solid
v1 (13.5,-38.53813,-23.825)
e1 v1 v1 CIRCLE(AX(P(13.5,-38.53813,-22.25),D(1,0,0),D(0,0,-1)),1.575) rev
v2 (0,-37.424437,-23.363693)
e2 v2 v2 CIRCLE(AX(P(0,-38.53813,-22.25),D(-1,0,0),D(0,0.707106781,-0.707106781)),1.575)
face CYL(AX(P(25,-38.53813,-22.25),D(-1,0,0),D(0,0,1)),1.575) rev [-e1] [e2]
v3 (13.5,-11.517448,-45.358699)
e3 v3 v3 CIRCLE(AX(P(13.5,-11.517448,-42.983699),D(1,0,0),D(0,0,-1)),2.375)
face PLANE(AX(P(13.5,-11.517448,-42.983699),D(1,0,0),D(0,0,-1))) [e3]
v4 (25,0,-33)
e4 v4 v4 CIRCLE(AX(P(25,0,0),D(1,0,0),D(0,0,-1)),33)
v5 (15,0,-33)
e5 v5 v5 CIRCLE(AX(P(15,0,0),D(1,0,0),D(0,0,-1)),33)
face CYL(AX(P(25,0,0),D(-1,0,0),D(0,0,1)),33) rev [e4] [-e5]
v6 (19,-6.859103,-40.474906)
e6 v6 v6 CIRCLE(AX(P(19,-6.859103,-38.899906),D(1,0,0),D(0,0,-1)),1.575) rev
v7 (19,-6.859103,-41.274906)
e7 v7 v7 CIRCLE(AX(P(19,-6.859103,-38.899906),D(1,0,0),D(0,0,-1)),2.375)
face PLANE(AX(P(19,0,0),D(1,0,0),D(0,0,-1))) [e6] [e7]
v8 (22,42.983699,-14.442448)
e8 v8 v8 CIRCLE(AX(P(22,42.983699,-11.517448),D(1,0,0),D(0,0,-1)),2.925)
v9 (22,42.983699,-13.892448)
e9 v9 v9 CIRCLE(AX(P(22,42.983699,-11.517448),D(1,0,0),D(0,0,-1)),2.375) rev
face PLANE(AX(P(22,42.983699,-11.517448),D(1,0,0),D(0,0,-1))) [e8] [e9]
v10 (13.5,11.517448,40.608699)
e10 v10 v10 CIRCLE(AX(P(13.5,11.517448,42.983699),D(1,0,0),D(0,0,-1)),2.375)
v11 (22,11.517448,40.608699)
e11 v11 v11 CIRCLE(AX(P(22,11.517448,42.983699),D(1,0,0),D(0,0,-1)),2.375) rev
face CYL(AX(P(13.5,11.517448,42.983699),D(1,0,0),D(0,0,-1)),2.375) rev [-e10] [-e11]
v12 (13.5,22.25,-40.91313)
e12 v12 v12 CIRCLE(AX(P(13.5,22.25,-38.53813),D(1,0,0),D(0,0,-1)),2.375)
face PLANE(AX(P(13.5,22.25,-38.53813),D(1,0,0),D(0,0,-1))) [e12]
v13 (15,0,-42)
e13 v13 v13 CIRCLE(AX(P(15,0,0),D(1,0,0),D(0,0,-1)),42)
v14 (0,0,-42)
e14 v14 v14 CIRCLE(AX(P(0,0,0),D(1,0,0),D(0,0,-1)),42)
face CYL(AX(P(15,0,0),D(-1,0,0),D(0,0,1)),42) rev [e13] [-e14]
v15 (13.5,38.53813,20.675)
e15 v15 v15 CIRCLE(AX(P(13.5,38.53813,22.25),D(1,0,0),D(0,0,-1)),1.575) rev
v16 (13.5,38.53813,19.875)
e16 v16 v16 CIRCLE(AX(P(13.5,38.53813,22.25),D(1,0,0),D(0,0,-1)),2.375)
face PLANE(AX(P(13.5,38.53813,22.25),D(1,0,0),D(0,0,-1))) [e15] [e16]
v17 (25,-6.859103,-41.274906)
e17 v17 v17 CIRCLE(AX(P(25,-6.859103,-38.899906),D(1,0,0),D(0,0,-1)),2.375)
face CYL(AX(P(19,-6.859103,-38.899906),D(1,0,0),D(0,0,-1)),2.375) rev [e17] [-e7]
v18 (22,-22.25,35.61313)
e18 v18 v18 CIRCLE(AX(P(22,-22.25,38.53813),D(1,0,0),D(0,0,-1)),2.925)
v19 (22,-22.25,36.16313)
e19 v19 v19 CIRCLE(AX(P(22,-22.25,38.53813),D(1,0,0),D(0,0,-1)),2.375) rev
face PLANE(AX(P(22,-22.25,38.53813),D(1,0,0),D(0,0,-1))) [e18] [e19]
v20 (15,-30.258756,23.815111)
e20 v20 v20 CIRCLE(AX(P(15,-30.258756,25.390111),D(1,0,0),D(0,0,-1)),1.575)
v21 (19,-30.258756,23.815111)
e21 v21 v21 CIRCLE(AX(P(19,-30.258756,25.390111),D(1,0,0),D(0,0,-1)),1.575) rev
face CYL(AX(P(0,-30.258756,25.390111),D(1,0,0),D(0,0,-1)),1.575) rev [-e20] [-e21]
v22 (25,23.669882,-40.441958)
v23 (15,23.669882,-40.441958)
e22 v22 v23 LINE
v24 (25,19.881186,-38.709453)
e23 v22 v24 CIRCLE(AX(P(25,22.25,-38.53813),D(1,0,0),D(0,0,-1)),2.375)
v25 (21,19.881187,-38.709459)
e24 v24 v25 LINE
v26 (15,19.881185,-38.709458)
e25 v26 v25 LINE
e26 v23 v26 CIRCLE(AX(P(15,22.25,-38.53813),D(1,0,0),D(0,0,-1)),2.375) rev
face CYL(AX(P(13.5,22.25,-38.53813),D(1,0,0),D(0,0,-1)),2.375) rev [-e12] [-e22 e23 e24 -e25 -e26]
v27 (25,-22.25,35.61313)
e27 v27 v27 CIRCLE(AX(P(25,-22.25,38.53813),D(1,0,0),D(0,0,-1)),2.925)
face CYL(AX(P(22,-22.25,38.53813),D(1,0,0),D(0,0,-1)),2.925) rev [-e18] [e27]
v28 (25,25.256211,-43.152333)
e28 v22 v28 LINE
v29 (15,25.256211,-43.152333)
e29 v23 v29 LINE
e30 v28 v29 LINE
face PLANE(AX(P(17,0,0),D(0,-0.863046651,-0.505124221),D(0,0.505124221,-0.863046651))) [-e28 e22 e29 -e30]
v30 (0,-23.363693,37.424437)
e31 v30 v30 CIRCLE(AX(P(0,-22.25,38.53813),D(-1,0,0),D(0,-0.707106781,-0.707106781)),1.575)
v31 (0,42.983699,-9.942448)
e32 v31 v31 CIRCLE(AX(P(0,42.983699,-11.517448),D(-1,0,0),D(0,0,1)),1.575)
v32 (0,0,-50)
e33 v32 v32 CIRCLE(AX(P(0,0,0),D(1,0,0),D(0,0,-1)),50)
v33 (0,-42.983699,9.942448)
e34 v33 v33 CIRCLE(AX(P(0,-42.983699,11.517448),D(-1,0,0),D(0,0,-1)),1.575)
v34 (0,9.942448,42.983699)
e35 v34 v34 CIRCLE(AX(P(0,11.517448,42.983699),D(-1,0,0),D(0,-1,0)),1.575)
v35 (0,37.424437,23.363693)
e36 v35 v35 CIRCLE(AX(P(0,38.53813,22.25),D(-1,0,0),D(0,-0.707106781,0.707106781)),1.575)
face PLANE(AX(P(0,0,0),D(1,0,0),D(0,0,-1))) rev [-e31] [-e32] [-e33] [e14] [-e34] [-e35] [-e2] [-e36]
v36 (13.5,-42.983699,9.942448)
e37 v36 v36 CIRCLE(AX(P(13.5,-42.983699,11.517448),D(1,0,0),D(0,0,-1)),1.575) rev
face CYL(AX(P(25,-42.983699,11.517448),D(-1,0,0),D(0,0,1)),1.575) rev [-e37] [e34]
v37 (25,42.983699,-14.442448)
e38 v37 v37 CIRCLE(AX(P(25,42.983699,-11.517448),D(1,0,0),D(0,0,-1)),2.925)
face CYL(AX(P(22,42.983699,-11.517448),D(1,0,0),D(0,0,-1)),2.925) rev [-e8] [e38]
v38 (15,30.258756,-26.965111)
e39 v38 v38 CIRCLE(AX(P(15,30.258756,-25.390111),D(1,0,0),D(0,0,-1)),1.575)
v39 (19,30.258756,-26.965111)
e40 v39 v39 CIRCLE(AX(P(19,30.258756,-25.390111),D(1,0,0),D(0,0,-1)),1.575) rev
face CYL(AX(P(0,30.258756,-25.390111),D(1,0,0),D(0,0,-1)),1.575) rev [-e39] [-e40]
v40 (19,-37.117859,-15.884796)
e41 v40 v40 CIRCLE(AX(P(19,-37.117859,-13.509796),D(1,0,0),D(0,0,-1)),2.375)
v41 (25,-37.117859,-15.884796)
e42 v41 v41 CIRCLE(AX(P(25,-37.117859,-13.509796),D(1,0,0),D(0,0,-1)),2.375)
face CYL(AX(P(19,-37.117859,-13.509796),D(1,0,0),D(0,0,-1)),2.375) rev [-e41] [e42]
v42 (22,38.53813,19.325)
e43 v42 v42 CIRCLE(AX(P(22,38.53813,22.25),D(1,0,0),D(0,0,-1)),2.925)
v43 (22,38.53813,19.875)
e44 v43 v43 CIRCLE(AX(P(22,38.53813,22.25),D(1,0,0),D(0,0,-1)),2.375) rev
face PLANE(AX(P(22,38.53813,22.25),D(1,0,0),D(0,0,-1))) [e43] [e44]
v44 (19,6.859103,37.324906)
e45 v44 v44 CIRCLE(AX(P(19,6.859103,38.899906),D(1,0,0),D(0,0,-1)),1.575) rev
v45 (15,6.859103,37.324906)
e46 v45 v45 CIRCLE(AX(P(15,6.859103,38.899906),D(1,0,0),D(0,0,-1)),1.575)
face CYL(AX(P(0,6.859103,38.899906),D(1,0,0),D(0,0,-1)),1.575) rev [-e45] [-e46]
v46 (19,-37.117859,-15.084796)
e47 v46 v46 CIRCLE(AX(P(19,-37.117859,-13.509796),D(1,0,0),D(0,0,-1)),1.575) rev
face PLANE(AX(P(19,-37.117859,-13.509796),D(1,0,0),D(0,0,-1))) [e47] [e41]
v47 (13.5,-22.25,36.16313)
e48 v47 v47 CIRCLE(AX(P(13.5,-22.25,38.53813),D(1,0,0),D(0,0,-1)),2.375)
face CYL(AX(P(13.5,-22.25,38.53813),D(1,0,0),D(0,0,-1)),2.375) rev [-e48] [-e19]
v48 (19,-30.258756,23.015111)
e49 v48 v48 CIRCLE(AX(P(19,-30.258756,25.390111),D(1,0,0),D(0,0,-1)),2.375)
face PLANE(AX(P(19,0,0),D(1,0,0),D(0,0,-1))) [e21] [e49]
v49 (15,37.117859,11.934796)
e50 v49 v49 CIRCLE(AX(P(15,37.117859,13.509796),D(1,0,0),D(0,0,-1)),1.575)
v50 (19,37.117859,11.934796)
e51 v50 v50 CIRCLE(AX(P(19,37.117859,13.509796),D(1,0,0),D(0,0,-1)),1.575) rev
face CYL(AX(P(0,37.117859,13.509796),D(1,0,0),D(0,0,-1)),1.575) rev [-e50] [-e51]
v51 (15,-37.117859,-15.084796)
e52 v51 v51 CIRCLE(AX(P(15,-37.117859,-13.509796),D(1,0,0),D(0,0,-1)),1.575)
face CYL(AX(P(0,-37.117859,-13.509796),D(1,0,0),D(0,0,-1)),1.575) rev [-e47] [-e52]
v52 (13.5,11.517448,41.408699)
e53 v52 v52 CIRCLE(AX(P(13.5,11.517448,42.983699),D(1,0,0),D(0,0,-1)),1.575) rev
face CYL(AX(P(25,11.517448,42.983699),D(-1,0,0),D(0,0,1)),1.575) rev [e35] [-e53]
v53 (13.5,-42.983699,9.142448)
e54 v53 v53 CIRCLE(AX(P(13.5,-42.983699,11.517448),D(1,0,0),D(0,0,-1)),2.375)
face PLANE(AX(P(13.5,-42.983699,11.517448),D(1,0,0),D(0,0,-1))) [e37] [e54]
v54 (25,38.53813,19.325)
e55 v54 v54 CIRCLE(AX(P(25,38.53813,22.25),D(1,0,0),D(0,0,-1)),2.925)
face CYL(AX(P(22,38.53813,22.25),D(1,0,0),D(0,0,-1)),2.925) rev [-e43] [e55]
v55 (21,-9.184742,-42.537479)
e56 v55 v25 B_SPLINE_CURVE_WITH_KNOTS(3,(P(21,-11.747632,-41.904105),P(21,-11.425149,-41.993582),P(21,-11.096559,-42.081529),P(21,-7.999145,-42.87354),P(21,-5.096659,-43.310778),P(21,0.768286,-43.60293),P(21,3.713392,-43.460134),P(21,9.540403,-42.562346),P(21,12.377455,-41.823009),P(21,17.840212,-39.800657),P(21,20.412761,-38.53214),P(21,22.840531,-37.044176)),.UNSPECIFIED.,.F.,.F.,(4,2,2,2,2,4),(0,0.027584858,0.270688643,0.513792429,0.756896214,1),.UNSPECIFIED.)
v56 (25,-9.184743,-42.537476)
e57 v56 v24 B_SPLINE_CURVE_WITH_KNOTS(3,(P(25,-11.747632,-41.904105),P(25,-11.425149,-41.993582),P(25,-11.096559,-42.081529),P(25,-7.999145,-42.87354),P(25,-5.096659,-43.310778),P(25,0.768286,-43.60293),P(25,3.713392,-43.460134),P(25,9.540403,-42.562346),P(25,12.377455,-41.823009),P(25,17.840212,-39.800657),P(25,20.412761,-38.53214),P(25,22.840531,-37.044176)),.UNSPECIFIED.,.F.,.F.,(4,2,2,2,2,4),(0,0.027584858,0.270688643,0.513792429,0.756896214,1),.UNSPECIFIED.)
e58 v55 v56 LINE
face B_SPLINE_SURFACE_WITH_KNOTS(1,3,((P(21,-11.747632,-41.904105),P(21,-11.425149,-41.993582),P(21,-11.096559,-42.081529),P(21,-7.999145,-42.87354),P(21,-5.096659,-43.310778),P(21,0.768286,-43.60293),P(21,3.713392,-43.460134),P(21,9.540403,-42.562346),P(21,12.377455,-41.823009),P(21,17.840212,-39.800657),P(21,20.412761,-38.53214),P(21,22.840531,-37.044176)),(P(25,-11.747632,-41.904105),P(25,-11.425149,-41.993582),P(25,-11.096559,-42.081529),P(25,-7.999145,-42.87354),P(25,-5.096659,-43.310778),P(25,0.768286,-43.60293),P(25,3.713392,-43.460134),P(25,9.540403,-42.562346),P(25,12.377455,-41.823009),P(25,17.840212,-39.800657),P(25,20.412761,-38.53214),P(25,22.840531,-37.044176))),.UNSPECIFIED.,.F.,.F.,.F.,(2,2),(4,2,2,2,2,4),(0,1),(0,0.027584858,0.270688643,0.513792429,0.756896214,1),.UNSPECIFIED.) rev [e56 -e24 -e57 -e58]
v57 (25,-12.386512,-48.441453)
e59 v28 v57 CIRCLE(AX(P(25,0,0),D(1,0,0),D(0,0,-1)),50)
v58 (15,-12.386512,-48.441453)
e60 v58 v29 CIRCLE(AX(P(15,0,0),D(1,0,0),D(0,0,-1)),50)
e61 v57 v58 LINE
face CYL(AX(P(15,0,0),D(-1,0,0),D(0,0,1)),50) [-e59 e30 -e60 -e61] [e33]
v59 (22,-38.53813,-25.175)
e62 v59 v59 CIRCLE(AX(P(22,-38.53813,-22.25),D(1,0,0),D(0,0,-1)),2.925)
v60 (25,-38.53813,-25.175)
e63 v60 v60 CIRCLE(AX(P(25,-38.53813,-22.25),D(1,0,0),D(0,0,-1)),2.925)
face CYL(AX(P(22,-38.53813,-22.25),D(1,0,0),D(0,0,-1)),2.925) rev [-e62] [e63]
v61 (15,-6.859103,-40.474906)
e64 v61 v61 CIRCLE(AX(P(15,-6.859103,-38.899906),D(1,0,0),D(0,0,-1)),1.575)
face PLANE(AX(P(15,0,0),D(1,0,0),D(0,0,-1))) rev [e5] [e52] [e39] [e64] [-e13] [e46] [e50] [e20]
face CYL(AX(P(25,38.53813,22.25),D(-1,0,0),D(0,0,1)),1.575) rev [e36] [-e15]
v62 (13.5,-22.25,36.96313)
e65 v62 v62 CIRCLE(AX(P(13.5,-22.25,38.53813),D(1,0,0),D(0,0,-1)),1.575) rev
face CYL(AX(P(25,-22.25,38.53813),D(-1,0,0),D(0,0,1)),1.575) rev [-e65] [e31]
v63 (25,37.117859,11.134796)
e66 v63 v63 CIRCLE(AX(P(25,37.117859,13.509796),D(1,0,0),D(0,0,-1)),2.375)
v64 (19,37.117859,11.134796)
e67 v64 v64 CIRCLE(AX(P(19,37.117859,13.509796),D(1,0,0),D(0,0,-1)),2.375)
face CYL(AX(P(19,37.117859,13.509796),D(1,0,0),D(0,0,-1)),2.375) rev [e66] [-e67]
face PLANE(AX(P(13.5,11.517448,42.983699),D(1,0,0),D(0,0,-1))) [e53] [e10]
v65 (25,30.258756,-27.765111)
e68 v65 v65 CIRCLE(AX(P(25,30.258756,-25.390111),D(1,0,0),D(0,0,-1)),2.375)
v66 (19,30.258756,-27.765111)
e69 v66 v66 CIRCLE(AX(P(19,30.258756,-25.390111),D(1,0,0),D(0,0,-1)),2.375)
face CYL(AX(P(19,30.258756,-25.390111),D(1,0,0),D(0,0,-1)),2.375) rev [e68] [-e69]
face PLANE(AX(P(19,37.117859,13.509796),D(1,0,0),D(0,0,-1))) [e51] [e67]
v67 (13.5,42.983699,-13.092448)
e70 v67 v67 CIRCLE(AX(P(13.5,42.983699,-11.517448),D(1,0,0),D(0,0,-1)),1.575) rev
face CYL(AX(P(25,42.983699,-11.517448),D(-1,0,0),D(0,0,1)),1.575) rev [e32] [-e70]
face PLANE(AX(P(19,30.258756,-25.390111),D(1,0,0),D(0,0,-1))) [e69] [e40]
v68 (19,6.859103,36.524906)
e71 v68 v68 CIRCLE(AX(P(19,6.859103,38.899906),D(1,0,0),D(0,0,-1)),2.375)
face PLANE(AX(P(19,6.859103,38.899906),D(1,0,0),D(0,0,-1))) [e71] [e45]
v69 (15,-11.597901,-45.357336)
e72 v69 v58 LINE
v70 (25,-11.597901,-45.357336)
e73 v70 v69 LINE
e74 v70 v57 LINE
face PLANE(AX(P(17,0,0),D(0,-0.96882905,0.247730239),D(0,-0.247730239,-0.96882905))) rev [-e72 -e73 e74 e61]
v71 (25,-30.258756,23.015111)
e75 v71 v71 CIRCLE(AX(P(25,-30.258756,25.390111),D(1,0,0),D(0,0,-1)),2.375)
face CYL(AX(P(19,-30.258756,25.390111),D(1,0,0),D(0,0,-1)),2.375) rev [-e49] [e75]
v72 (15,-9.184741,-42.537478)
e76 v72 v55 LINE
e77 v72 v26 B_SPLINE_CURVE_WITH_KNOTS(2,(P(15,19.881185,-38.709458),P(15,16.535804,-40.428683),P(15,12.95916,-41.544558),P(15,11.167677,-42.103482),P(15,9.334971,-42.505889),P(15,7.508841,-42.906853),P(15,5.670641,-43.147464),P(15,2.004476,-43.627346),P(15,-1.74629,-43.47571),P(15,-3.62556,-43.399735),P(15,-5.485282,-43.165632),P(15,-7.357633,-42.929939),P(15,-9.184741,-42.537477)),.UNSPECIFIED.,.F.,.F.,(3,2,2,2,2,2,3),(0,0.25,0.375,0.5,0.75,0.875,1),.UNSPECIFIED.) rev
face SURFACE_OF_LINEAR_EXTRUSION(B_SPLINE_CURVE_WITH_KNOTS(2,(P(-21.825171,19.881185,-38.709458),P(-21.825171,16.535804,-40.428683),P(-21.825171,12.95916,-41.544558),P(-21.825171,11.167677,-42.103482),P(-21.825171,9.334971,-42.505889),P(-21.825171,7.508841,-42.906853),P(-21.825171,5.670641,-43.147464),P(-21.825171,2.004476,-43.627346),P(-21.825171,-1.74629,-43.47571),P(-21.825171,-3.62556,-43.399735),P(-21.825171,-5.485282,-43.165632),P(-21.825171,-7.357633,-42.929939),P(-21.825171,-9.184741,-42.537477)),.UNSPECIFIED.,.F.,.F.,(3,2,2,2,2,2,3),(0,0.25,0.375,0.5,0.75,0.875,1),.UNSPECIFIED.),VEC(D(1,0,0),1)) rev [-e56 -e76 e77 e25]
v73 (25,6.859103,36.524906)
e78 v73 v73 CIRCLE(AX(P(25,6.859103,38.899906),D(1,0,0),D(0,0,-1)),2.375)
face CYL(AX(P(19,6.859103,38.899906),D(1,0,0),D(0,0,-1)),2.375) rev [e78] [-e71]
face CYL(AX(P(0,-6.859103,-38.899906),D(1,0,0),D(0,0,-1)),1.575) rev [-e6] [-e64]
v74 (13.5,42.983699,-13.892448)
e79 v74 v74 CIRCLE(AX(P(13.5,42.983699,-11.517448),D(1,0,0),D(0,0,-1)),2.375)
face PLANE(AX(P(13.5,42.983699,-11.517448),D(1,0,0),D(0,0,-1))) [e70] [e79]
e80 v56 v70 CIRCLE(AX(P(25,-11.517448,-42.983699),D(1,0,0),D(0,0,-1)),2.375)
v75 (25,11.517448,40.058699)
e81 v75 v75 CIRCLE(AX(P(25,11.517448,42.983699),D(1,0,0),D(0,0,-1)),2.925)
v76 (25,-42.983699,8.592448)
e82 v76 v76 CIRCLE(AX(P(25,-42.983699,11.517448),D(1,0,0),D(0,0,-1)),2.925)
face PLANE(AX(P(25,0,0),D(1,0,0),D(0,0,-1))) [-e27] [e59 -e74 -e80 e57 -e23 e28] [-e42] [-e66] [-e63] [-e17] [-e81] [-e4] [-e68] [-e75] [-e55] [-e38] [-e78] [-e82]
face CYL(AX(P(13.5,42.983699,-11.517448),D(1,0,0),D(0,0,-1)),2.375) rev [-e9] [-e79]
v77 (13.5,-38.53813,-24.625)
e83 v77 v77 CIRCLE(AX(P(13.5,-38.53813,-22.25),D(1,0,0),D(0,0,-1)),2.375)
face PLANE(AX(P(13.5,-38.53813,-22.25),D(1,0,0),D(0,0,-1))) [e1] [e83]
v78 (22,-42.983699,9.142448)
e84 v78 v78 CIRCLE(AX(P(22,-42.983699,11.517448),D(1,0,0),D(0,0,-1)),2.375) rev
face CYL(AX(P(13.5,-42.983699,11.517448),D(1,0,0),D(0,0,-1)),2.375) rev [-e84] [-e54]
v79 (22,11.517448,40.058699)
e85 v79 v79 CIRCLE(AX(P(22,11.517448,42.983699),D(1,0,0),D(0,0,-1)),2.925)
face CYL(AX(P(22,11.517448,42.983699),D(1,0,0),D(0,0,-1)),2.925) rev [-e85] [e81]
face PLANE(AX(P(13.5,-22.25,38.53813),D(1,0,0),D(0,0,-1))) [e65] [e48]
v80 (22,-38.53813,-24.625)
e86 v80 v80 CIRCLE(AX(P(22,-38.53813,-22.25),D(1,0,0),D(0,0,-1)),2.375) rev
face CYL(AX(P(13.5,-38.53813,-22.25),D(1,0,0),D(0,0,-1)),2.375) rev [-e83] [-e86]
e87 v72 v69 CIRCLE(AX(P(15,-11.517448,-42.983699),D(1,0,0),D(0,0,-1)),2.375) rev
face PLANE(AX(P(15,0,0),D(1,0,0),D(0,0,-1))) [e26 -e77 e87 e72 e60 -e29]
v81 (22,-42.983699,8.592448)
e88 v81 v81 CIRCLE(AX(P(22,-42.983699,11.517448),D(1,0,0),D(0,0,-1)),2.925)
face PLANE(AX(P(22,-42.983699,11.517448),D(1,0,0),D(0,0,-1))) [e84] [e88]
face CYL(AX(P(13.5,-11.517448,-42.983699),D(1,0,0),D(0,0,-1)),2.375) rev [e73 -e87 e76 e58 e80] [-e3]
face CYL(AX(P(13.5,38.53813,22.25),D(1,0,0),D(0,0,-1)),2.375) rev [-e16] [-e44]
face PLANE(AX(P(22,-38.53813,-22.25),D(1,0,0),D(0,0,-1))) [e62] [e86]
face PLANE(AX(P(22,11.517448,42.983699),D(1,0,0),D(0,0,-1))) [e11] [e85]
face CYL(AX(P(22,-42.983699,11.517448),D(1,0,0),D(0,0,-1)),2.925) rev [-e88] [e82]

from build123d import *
from OCP.BRepAlgoAPI import BRepAlgoAPI_Cut
from OCP.TopTools import TopTools_ListOfShape

# Parameters (mm, degrees)
SKETCH1_R           = 50
SKETCH1_R_2         = 42
BOSS_EXTRUDE1_DEPTH = 15
SKETCH2_R           = 47.5
SKETCH2_R_2         = 33
BOSS_EXTRUDE2_DEPTH = 10
SKETCH4_R           = 1.575
CUT_EXTRUDE2_DEPTH  = 76
CIRPATTERN2_COUNT   = 8
SKETCH7_R           = 1.575
CUT_EXTRUDE3_DEPTH  = 76
CIRPATTERN3_COUNT   = 6
SKETCH17_R          = 2.375
CUT_EXTRUDE7_DEPTH  = 11.5
SKETCH18_R          = 2.375
SKETCH18_R_2        = 1.575
CUT_EXTRUDE8_DEPTH  = 6
CUT_EXTRUDE6_DEPTH  = 8
CUT_SWEEP1_START    = 21
CUT_SWEEP1_DEPTH    = 5
BOSS_EXTRUDE6_DEPTH = 10
SKETCH19_R          = 1.575
BOSS_EXTRUDE7_DEPTH = 13.5
CUT_EXTRUDE9_START  = -6
CUT_EXTRUDE9_DEPTH  = 6
SKETCH21_R          = 2.925
CUT_EXTRUDE10_DEPTH = 3


with BuildPart() as part:
    # Sketch1 → Boss-Extrude1 (new body)
    with BuildSketch(Plane(origin=(0, 0, 0), x_dir=(0, 0, -1), z_dir=(1, 0, 0))):
        Circle(SKETCH1_R)
        Circle(SKETCH1_R_2, mode=Mode.SUBTRACT)
    extrude(amount=BOSS_EXTRUDE1_DEPTH)

    # Sketch2 → Boss-Extrude2 (add)
    with BuildSketch(Plane(origin=(15, 0, 0), x_dir=(0, 0, -1), z_dir=(1, 0, 0))):
        Circle(SKETCH2_R)
        Circle(SKETCH2_R_2, mode=Mode.SUBTRACT)
    extrude(amount=BOSS_EXTRUDE2_DEPTH)

    # Sketch4 → Cut-Extrude2 (cut, through all)
    with BuildSketch(Plane.ZY):
        with Locations((-11.517447507, 42.98369927)):
            Circle(SKETCH4_R)
    cut_extrude2 = extrude(amount=-CUT_EXTRUDE2_DEPTH, mode=Mode.SUBTRACT)

    # CirPattern2: Cut-Extrude2 ×8 about axis
    cirpattern2_axis = Axis((0, 0, 0), (1, 0, 0))
    for i in range(1, CIRPATTERN2_COUNT):
        add(cut_extrude2.rotate(cirpattern2_axis, i * 360 / CIRPATTERN2_COUNT), mode=Mode.SUBTRACT)

    # Sketch7 → Cut-Extrude3 (cut, through all)
    with BuildSketch(Plane(origin=(25, 0, 0), x_dir=(0, 0, -1), z_dir=(1, 0, 0))):
        with Locations((-13.509795661, 37.117858521)):
            Circle(SKETCH7_R)
    cut_extrude3 = extrude(amount=-CUT_EXTRUDE3_DEPTH, mode=Mode.SUBTRACT)

    # CirPattern3: Cut-Extrude3 ×6 about axis
    cirpattern3_axis = Axis((0, 0, 0), (1, 0, 0))
    for i in range(1, CIRPATTERN3_COUNT):
        add(cut_extrude3.rotate(cirpattern3_axis, i * 360 / CIRPATTERN3_COUNT), mode=Mode.SUBTRACT)

    # Sketch17 → Cut-Extrude7 (cut)
    with BuildSketch(Plane(origin=(25, 0, 0), x_dir=(0, 0, -1), z_dir=(1, 0, 0))):
        with Locations((-42.98369927, 11.517447507)):
            Circle(SKETCH17_R)
        with Locations((-38.538130468, -22.25)):
            Circle(SKETCH17_R)
        with Locations((-11.517447507, -42.98369927)):
            Circle(SKETCH17_R)
        with Locations((22.25, -38.538130468)):
            Circle(SKETCH17_R)
        with Locations((42.98369927, -11.517447507)):
            Circle(SKETCH17_R)
        with Locations((38.538130468, 22.25)):
            Circle(SKETCH17_R)
        with Locations((11.517447507, 42.98369927)):
            Circle(SKETCH17_R)
        with Locations((-22.25, 38.538130468)):
            Circle(SKETCH17_R)
    extrude(amount=-CUT_EXTRUDE7_DEPTH, mode=Mode.SUBTRACT)

    # Sketch18 → Cut-Extrude8 (cut)
    # profile 1 of 6: a face of its own
    with BuildSketch(Plane(origin=(25, 0, 0), x_dir=(0, 0, -1), z_dir=(1, 0, 0))):
        with Locations((-38.899906244, 6.859103018)):
            Circle(SKETCH18_R)
        with Locations((-38.899906244, 6.859103018)):
            Circle(SKETCH18_R_2, mode=Mode.SUBTRACT)
    # profile 2 of 6: a face of its own
    with BuildSketch(Plane(origin=(25, 0, 0), x_dir=(0, 0, -1), z_dir=(1, 0, 0))):
        with Locations((-25.390110583, -30.258755503)):
            Circle(SKETCH18_R)
        with Locations((-25.390110583, -30.258755503)):
            Circle(SKETCH18_R_2, mode=Mode.SUBTRACT)
    # profile 3 of 6: a face of its own
    with BuildSketch(Plane(origin=(25, 0, 0), x_dir=(0, 0, -1), z_dir=(1, 0, 0))):
        with Locations((13.509795661, -37.117858521)):
            Circle(SKETCH18_R)
        with Locations((13.509795661, -37.117858521)):
            Circle(SKETCH18_R_2, mode=Mode.SUBTRACT)
    # profile 4 of 6: a face of its own
    with BuildSketch(Plane(origin=(25, 0, 0), x_dir=(0, 0, -1), z_dir=(1, 0, 0))):
        with Locations((38.899906244, -6.859103018)):
            Circle(SKETCH18_R)
        with Locations((38.899906244, -6.859103018)):
            Circle(SKETCH18_R_2, mode=Mode.SUBTRACT)
    # profile 5 of 6: a face of its own
    with BuildSketch(Plane(origin=(25, 0, 0), x_dir=(0, 0, -1), z_dir=(1, 0, 0))):
        with Locations((25.390110583, 30.258755503)):
            Circle(SKETCH18_R)
        with Locations((25.390110583, 30.258755503)):
            Circle(SKETCH18_R_2, mode=Mode.SUBTRACT)
    # profile 6 of 6: a face of its own
    with BuildSketch(Plane(origin=(25, 0, 0), x_dir=(0, 0, -1), z_dir=(1, 0, 0))):
        with Locations((-13.509795661, 37.117858521)):
            Circle(SKETCH18_R)
        with Locations((-13.509795661, 37.117858521)):
            Circle(SKETCH18_R_2, mode=Mode.SUBTRACT)
    extrude(amount=-CUT_EXTRUDE8_DEPTH, mode=Mode.SUBTRACT)

    # Sketch12 → Cut-Extrude6 (cut)
    with BuildSketch(Plane(origin=(25, 0, 0), x_dir=(0, 0, -1), z_dir=(1, 0, 0))):
        with BuildLine():
            ThreePointArc((39.732510194, 23.254656307), (45.589669783, 6.405733006), (44.602467407, -11.404880862))
            Line((44.602467407, -11.404880862), (46.019379893, -11.767186336))
            ThreePointArc((46.019379893, -11.767186336), (47.128391363, -5.929985459), (47.5, 0))
            ThreePointArc((47.5, 0), (45.84484162, 12.429822882), (40.994715921, 23.99340048))
            Line((40.994715921, 23.99340048), (39.732510194, 23.254656307))
        make_face()
        with BuildLine():
            ThreePointArc((47.5, 0), (47.128391363, -5.929985459), (46.019379893, -11.767186336))
            Line((46.019379893, -11.767186336), (47.508954558, -12.148071578))
            ThreePointArc((47.508954558, -12.148071578), (48.560487254, 6.82315791), (42.321650147, 24.770028969))
            Line((42.321650147, 24.770028969), (40.994715921, 23.99340048))
            ThreePointArc((40.994715921, 23.99340048), (45.84484162, 12.429822882), (47.5, 0))
        make_face()
        with BuildLine():
            ThreePointArc((44.909683958, -10.127768414), (44.760630743, -10.767420383), (44.602467407, -11.404880862))
            Line((44.602467407, -11.404880862), (45.357336181, -11.597901314))
            ThreePointArc((45.357336181, -11.597901314), (45.358358473, -11.557680184), (45.35869927, -11.517447507))
            ThreePointArc((45.35869927, -11.517447507), (45.243659295, -10.787238165), (44.909683958, -10.127768414))
        make_face()
        with BuildLine():
            ThreePointArc((39.732510194, 23.254656307), (40.255948718, 22.336293316), (40.758164235, 21.406154592))
            ThreePointArc((40.758164235, 21.406154592), (40.874067668, 21.821021677), (40.913130468, 22.25))
            ThreePointArc((40.913130468, 22.25), (40.792261739, 22.998008833), (40.441958077, 23.669882191))
            Line((40.441958077, 23.669882191), (39.732510194, 23.254656307))
        make_face()
    extrude(amount=-CUT_EXTRUDE6_DEPTH, mode=Mode.SUBTRACT)

    # Cut-Sweep1: read off the stored shape, not the designer's step
    # Cut-Sweep1 outline → Cut-Sweep1 (cut)
    with BuildSketch(Plane.YZ.offset(CUT_SWEEP1_START)):
        with BuildLine():
            add(Edge.make_bspline(
                [(-9.184742958, -42.537476808), (-6.896414636, -43.029008788), (-4.540142558, -43.338499502), (0.768286017, -43.602929952), (3.713391759, -43.460134373), (9.540403061, -42.562346065), (12.377455207, -41.823008905), (16.756379009, -40.201899634), (18.346135753, -39.498335389), (19.881187558, -38.709456514)],
                knots=[0.073720378, 0.073720378, 0.073720378, 0.073720378, 0.270688643, 0.270688643, 0.513792429, 0.513792429, 0.756896214, 0.756896214, 0.903534461, 0.903534461, 0.903534461, 0.903534461], degree=3))
            ThreePointArc((-9.184742958, -42.537476808), (-9.310441235, -43.861052286), (-10.127768414, -44.909683958))
            ThreePointArc((-10.127768414, -44.909683958), (6.009099575, -45.643642805), (21.406154592, -40.758164235))
            ThreePointArc((21.406154592, -40.758164235), (20.344850807, -39.95623891), (19.881187558, -38.709456514))
        make_face()
    extrude(amount=CUT_SWEEP1_DEPTH, mode=Mode.SUBTRACT)

    # Sketch16 → Boss-Extrude6 (add)
    with BuildSketch(Plane(origin=(15, 0, 0), x_dir=(0, 0, -1), z_dir=(1, 0, 0))):
        with BuildLine():
            Line((48.441452519, -12.386511932), (46.019379893, -11.767186336))
            ThreePointArc((46.019379893, -11.767186336), (-47.0379433, -6.609227646), (40.994715921, 23.99340048))
            Line((40.994715921, 23.99340048), (43.152332548, 25.256211031))
            ThreePointArc((43.152332548, 25.256211031), (-49.513624527, -6.957081733), (48.441452519, -12.386511932))
        make_face()
    extrude(amount=BOSS_EXTRUDE6_DEPTH)

    # Sketch19 → Boss-Extrude7 (add)
    with BuildSketch(Plane.ZY):
        with Locations((-38.538130468, 22.25)):
            Circle(SKETCH19_R)
        with Locations((-42.98369927, -11.517447507)):
            Circle(SKETCH19_R)
    extrude(amount=-BOSS_EXTRUDE7_DEPTH)


with BuildPart() as cut_extrude9_tool:
    # Cut-Extrude9: read off the stored shape, not the designer's step
    # Cut-Extrude9 outline → Cut-Extrude9 (new body)
    with BuildSketch(Plane(origin=(21, 0, 0), x_dir=(0, 0, -1), z_dir=(1, 0, 0)).offset(CUT_EXTRUDE9_START)):
        with BuildLine():
            add(Edge.make_bspline(
                [(38.709457577, 19.881185488), (40.428683332, 16.535803809), (41.544558093, 12.959160077), (42.103481625, 11.167677363), (42.505889448, 9.334971056), (42.90685332, 7.508841011), (43.147464222, 5.670640546), (43.627346092, 2.004476351), (43.47570998, -1.746290068), (43.399734773, -3.625560465), (43.165631914, -5.485281769), (42.929939197, -7.357632971), (42.537477197, -9.184741145)],
                knots=[0, 0, 0, 0.25, 0.25, 0.375, 0.375, 0.5, 0.5, 0.75, 0.75, 0.875, 0.875, 1, 1, 1], degree=2))
            ThreePointArc((42.537477197, -9.184741145), (44.527903199, -9.712992125), (45.357336181, -11.597901314))
            Line((45.357336181, -11.597901314), (46.019379893, -11.767186336))
            ThreePointArc((46.019379893, -11.767186336), (47.0379433, 6.609227646), (40.994715921, 23.99340048))
            Line((40.994715921, 23.99340048), (40.441958077, 23.669882191))
            ThreePointArc((40.441958077, 23.669882191), (40.698018948, 21.262322546), (38.709457577, 19.881185488))
        make_face()
    extrude(amount=CUT_EXTRUDE9_DEPTH)


with BuildPart() as part_1:
    add(part.part)

    # Cut-Extrude9: cut by cut_extrude9_tool, with a tolerance
    cut_extrude9_stock = TopTools_ListOfShape()
    cut_extrude9_stock.Append(part_1.part.wrapped)
    cut_extrude9_tools = TopTools_ListOfShape()
    cut_extrude9_tools.Append(cut_extrude9_tool.part.wrapped)
    cut_extrude9_cut = BRepAlgoAPI_Cut()
    cut_extrude9_cut.SetArguments(cut_extrude9_stock)
    cut_extrude9_cut.SetTools(cut_extrude9_tools)
    cut_extrude9_cut.SetFuzzyValue(0.00001)
    cut_extrude9_cut.Build()
    add(Compound.cast(cut_extrude9_cut.Shape()).solids(), mode=Mode.REPLACE)

    # Sketch21 → Cut-Extrude10 (cut)
    with BuildSketch(Plane(origin=(25, 0, 0), x_dir=(0, 0, -1), z_dir=(1, 0, 0))):
        with Locations((-42.98369927, 11.517447507)):
            Circle(SKETCH21_R)
        with Locations((-22.25, 38.538130468)):
            Circle(SKETCH21_R)
        with Locations((11.517447507, 42.98369927)):
            Circle(SKETCH21_R)
        with Locations((22.25, -38.538130468)):
            Circle(SKETCH21_R)
        with Locations((-11.517447507, -42.98369927)):
            Circle(SKETCH21_R)
        with Locations((-38.538130468, -22.25)):
            Circle(SKETCH21_R)
    extrude(amount=-CUT_EXTRUDE10_DEPTH, mode=Mode.SUBTRACT)


solid = part_1.part
